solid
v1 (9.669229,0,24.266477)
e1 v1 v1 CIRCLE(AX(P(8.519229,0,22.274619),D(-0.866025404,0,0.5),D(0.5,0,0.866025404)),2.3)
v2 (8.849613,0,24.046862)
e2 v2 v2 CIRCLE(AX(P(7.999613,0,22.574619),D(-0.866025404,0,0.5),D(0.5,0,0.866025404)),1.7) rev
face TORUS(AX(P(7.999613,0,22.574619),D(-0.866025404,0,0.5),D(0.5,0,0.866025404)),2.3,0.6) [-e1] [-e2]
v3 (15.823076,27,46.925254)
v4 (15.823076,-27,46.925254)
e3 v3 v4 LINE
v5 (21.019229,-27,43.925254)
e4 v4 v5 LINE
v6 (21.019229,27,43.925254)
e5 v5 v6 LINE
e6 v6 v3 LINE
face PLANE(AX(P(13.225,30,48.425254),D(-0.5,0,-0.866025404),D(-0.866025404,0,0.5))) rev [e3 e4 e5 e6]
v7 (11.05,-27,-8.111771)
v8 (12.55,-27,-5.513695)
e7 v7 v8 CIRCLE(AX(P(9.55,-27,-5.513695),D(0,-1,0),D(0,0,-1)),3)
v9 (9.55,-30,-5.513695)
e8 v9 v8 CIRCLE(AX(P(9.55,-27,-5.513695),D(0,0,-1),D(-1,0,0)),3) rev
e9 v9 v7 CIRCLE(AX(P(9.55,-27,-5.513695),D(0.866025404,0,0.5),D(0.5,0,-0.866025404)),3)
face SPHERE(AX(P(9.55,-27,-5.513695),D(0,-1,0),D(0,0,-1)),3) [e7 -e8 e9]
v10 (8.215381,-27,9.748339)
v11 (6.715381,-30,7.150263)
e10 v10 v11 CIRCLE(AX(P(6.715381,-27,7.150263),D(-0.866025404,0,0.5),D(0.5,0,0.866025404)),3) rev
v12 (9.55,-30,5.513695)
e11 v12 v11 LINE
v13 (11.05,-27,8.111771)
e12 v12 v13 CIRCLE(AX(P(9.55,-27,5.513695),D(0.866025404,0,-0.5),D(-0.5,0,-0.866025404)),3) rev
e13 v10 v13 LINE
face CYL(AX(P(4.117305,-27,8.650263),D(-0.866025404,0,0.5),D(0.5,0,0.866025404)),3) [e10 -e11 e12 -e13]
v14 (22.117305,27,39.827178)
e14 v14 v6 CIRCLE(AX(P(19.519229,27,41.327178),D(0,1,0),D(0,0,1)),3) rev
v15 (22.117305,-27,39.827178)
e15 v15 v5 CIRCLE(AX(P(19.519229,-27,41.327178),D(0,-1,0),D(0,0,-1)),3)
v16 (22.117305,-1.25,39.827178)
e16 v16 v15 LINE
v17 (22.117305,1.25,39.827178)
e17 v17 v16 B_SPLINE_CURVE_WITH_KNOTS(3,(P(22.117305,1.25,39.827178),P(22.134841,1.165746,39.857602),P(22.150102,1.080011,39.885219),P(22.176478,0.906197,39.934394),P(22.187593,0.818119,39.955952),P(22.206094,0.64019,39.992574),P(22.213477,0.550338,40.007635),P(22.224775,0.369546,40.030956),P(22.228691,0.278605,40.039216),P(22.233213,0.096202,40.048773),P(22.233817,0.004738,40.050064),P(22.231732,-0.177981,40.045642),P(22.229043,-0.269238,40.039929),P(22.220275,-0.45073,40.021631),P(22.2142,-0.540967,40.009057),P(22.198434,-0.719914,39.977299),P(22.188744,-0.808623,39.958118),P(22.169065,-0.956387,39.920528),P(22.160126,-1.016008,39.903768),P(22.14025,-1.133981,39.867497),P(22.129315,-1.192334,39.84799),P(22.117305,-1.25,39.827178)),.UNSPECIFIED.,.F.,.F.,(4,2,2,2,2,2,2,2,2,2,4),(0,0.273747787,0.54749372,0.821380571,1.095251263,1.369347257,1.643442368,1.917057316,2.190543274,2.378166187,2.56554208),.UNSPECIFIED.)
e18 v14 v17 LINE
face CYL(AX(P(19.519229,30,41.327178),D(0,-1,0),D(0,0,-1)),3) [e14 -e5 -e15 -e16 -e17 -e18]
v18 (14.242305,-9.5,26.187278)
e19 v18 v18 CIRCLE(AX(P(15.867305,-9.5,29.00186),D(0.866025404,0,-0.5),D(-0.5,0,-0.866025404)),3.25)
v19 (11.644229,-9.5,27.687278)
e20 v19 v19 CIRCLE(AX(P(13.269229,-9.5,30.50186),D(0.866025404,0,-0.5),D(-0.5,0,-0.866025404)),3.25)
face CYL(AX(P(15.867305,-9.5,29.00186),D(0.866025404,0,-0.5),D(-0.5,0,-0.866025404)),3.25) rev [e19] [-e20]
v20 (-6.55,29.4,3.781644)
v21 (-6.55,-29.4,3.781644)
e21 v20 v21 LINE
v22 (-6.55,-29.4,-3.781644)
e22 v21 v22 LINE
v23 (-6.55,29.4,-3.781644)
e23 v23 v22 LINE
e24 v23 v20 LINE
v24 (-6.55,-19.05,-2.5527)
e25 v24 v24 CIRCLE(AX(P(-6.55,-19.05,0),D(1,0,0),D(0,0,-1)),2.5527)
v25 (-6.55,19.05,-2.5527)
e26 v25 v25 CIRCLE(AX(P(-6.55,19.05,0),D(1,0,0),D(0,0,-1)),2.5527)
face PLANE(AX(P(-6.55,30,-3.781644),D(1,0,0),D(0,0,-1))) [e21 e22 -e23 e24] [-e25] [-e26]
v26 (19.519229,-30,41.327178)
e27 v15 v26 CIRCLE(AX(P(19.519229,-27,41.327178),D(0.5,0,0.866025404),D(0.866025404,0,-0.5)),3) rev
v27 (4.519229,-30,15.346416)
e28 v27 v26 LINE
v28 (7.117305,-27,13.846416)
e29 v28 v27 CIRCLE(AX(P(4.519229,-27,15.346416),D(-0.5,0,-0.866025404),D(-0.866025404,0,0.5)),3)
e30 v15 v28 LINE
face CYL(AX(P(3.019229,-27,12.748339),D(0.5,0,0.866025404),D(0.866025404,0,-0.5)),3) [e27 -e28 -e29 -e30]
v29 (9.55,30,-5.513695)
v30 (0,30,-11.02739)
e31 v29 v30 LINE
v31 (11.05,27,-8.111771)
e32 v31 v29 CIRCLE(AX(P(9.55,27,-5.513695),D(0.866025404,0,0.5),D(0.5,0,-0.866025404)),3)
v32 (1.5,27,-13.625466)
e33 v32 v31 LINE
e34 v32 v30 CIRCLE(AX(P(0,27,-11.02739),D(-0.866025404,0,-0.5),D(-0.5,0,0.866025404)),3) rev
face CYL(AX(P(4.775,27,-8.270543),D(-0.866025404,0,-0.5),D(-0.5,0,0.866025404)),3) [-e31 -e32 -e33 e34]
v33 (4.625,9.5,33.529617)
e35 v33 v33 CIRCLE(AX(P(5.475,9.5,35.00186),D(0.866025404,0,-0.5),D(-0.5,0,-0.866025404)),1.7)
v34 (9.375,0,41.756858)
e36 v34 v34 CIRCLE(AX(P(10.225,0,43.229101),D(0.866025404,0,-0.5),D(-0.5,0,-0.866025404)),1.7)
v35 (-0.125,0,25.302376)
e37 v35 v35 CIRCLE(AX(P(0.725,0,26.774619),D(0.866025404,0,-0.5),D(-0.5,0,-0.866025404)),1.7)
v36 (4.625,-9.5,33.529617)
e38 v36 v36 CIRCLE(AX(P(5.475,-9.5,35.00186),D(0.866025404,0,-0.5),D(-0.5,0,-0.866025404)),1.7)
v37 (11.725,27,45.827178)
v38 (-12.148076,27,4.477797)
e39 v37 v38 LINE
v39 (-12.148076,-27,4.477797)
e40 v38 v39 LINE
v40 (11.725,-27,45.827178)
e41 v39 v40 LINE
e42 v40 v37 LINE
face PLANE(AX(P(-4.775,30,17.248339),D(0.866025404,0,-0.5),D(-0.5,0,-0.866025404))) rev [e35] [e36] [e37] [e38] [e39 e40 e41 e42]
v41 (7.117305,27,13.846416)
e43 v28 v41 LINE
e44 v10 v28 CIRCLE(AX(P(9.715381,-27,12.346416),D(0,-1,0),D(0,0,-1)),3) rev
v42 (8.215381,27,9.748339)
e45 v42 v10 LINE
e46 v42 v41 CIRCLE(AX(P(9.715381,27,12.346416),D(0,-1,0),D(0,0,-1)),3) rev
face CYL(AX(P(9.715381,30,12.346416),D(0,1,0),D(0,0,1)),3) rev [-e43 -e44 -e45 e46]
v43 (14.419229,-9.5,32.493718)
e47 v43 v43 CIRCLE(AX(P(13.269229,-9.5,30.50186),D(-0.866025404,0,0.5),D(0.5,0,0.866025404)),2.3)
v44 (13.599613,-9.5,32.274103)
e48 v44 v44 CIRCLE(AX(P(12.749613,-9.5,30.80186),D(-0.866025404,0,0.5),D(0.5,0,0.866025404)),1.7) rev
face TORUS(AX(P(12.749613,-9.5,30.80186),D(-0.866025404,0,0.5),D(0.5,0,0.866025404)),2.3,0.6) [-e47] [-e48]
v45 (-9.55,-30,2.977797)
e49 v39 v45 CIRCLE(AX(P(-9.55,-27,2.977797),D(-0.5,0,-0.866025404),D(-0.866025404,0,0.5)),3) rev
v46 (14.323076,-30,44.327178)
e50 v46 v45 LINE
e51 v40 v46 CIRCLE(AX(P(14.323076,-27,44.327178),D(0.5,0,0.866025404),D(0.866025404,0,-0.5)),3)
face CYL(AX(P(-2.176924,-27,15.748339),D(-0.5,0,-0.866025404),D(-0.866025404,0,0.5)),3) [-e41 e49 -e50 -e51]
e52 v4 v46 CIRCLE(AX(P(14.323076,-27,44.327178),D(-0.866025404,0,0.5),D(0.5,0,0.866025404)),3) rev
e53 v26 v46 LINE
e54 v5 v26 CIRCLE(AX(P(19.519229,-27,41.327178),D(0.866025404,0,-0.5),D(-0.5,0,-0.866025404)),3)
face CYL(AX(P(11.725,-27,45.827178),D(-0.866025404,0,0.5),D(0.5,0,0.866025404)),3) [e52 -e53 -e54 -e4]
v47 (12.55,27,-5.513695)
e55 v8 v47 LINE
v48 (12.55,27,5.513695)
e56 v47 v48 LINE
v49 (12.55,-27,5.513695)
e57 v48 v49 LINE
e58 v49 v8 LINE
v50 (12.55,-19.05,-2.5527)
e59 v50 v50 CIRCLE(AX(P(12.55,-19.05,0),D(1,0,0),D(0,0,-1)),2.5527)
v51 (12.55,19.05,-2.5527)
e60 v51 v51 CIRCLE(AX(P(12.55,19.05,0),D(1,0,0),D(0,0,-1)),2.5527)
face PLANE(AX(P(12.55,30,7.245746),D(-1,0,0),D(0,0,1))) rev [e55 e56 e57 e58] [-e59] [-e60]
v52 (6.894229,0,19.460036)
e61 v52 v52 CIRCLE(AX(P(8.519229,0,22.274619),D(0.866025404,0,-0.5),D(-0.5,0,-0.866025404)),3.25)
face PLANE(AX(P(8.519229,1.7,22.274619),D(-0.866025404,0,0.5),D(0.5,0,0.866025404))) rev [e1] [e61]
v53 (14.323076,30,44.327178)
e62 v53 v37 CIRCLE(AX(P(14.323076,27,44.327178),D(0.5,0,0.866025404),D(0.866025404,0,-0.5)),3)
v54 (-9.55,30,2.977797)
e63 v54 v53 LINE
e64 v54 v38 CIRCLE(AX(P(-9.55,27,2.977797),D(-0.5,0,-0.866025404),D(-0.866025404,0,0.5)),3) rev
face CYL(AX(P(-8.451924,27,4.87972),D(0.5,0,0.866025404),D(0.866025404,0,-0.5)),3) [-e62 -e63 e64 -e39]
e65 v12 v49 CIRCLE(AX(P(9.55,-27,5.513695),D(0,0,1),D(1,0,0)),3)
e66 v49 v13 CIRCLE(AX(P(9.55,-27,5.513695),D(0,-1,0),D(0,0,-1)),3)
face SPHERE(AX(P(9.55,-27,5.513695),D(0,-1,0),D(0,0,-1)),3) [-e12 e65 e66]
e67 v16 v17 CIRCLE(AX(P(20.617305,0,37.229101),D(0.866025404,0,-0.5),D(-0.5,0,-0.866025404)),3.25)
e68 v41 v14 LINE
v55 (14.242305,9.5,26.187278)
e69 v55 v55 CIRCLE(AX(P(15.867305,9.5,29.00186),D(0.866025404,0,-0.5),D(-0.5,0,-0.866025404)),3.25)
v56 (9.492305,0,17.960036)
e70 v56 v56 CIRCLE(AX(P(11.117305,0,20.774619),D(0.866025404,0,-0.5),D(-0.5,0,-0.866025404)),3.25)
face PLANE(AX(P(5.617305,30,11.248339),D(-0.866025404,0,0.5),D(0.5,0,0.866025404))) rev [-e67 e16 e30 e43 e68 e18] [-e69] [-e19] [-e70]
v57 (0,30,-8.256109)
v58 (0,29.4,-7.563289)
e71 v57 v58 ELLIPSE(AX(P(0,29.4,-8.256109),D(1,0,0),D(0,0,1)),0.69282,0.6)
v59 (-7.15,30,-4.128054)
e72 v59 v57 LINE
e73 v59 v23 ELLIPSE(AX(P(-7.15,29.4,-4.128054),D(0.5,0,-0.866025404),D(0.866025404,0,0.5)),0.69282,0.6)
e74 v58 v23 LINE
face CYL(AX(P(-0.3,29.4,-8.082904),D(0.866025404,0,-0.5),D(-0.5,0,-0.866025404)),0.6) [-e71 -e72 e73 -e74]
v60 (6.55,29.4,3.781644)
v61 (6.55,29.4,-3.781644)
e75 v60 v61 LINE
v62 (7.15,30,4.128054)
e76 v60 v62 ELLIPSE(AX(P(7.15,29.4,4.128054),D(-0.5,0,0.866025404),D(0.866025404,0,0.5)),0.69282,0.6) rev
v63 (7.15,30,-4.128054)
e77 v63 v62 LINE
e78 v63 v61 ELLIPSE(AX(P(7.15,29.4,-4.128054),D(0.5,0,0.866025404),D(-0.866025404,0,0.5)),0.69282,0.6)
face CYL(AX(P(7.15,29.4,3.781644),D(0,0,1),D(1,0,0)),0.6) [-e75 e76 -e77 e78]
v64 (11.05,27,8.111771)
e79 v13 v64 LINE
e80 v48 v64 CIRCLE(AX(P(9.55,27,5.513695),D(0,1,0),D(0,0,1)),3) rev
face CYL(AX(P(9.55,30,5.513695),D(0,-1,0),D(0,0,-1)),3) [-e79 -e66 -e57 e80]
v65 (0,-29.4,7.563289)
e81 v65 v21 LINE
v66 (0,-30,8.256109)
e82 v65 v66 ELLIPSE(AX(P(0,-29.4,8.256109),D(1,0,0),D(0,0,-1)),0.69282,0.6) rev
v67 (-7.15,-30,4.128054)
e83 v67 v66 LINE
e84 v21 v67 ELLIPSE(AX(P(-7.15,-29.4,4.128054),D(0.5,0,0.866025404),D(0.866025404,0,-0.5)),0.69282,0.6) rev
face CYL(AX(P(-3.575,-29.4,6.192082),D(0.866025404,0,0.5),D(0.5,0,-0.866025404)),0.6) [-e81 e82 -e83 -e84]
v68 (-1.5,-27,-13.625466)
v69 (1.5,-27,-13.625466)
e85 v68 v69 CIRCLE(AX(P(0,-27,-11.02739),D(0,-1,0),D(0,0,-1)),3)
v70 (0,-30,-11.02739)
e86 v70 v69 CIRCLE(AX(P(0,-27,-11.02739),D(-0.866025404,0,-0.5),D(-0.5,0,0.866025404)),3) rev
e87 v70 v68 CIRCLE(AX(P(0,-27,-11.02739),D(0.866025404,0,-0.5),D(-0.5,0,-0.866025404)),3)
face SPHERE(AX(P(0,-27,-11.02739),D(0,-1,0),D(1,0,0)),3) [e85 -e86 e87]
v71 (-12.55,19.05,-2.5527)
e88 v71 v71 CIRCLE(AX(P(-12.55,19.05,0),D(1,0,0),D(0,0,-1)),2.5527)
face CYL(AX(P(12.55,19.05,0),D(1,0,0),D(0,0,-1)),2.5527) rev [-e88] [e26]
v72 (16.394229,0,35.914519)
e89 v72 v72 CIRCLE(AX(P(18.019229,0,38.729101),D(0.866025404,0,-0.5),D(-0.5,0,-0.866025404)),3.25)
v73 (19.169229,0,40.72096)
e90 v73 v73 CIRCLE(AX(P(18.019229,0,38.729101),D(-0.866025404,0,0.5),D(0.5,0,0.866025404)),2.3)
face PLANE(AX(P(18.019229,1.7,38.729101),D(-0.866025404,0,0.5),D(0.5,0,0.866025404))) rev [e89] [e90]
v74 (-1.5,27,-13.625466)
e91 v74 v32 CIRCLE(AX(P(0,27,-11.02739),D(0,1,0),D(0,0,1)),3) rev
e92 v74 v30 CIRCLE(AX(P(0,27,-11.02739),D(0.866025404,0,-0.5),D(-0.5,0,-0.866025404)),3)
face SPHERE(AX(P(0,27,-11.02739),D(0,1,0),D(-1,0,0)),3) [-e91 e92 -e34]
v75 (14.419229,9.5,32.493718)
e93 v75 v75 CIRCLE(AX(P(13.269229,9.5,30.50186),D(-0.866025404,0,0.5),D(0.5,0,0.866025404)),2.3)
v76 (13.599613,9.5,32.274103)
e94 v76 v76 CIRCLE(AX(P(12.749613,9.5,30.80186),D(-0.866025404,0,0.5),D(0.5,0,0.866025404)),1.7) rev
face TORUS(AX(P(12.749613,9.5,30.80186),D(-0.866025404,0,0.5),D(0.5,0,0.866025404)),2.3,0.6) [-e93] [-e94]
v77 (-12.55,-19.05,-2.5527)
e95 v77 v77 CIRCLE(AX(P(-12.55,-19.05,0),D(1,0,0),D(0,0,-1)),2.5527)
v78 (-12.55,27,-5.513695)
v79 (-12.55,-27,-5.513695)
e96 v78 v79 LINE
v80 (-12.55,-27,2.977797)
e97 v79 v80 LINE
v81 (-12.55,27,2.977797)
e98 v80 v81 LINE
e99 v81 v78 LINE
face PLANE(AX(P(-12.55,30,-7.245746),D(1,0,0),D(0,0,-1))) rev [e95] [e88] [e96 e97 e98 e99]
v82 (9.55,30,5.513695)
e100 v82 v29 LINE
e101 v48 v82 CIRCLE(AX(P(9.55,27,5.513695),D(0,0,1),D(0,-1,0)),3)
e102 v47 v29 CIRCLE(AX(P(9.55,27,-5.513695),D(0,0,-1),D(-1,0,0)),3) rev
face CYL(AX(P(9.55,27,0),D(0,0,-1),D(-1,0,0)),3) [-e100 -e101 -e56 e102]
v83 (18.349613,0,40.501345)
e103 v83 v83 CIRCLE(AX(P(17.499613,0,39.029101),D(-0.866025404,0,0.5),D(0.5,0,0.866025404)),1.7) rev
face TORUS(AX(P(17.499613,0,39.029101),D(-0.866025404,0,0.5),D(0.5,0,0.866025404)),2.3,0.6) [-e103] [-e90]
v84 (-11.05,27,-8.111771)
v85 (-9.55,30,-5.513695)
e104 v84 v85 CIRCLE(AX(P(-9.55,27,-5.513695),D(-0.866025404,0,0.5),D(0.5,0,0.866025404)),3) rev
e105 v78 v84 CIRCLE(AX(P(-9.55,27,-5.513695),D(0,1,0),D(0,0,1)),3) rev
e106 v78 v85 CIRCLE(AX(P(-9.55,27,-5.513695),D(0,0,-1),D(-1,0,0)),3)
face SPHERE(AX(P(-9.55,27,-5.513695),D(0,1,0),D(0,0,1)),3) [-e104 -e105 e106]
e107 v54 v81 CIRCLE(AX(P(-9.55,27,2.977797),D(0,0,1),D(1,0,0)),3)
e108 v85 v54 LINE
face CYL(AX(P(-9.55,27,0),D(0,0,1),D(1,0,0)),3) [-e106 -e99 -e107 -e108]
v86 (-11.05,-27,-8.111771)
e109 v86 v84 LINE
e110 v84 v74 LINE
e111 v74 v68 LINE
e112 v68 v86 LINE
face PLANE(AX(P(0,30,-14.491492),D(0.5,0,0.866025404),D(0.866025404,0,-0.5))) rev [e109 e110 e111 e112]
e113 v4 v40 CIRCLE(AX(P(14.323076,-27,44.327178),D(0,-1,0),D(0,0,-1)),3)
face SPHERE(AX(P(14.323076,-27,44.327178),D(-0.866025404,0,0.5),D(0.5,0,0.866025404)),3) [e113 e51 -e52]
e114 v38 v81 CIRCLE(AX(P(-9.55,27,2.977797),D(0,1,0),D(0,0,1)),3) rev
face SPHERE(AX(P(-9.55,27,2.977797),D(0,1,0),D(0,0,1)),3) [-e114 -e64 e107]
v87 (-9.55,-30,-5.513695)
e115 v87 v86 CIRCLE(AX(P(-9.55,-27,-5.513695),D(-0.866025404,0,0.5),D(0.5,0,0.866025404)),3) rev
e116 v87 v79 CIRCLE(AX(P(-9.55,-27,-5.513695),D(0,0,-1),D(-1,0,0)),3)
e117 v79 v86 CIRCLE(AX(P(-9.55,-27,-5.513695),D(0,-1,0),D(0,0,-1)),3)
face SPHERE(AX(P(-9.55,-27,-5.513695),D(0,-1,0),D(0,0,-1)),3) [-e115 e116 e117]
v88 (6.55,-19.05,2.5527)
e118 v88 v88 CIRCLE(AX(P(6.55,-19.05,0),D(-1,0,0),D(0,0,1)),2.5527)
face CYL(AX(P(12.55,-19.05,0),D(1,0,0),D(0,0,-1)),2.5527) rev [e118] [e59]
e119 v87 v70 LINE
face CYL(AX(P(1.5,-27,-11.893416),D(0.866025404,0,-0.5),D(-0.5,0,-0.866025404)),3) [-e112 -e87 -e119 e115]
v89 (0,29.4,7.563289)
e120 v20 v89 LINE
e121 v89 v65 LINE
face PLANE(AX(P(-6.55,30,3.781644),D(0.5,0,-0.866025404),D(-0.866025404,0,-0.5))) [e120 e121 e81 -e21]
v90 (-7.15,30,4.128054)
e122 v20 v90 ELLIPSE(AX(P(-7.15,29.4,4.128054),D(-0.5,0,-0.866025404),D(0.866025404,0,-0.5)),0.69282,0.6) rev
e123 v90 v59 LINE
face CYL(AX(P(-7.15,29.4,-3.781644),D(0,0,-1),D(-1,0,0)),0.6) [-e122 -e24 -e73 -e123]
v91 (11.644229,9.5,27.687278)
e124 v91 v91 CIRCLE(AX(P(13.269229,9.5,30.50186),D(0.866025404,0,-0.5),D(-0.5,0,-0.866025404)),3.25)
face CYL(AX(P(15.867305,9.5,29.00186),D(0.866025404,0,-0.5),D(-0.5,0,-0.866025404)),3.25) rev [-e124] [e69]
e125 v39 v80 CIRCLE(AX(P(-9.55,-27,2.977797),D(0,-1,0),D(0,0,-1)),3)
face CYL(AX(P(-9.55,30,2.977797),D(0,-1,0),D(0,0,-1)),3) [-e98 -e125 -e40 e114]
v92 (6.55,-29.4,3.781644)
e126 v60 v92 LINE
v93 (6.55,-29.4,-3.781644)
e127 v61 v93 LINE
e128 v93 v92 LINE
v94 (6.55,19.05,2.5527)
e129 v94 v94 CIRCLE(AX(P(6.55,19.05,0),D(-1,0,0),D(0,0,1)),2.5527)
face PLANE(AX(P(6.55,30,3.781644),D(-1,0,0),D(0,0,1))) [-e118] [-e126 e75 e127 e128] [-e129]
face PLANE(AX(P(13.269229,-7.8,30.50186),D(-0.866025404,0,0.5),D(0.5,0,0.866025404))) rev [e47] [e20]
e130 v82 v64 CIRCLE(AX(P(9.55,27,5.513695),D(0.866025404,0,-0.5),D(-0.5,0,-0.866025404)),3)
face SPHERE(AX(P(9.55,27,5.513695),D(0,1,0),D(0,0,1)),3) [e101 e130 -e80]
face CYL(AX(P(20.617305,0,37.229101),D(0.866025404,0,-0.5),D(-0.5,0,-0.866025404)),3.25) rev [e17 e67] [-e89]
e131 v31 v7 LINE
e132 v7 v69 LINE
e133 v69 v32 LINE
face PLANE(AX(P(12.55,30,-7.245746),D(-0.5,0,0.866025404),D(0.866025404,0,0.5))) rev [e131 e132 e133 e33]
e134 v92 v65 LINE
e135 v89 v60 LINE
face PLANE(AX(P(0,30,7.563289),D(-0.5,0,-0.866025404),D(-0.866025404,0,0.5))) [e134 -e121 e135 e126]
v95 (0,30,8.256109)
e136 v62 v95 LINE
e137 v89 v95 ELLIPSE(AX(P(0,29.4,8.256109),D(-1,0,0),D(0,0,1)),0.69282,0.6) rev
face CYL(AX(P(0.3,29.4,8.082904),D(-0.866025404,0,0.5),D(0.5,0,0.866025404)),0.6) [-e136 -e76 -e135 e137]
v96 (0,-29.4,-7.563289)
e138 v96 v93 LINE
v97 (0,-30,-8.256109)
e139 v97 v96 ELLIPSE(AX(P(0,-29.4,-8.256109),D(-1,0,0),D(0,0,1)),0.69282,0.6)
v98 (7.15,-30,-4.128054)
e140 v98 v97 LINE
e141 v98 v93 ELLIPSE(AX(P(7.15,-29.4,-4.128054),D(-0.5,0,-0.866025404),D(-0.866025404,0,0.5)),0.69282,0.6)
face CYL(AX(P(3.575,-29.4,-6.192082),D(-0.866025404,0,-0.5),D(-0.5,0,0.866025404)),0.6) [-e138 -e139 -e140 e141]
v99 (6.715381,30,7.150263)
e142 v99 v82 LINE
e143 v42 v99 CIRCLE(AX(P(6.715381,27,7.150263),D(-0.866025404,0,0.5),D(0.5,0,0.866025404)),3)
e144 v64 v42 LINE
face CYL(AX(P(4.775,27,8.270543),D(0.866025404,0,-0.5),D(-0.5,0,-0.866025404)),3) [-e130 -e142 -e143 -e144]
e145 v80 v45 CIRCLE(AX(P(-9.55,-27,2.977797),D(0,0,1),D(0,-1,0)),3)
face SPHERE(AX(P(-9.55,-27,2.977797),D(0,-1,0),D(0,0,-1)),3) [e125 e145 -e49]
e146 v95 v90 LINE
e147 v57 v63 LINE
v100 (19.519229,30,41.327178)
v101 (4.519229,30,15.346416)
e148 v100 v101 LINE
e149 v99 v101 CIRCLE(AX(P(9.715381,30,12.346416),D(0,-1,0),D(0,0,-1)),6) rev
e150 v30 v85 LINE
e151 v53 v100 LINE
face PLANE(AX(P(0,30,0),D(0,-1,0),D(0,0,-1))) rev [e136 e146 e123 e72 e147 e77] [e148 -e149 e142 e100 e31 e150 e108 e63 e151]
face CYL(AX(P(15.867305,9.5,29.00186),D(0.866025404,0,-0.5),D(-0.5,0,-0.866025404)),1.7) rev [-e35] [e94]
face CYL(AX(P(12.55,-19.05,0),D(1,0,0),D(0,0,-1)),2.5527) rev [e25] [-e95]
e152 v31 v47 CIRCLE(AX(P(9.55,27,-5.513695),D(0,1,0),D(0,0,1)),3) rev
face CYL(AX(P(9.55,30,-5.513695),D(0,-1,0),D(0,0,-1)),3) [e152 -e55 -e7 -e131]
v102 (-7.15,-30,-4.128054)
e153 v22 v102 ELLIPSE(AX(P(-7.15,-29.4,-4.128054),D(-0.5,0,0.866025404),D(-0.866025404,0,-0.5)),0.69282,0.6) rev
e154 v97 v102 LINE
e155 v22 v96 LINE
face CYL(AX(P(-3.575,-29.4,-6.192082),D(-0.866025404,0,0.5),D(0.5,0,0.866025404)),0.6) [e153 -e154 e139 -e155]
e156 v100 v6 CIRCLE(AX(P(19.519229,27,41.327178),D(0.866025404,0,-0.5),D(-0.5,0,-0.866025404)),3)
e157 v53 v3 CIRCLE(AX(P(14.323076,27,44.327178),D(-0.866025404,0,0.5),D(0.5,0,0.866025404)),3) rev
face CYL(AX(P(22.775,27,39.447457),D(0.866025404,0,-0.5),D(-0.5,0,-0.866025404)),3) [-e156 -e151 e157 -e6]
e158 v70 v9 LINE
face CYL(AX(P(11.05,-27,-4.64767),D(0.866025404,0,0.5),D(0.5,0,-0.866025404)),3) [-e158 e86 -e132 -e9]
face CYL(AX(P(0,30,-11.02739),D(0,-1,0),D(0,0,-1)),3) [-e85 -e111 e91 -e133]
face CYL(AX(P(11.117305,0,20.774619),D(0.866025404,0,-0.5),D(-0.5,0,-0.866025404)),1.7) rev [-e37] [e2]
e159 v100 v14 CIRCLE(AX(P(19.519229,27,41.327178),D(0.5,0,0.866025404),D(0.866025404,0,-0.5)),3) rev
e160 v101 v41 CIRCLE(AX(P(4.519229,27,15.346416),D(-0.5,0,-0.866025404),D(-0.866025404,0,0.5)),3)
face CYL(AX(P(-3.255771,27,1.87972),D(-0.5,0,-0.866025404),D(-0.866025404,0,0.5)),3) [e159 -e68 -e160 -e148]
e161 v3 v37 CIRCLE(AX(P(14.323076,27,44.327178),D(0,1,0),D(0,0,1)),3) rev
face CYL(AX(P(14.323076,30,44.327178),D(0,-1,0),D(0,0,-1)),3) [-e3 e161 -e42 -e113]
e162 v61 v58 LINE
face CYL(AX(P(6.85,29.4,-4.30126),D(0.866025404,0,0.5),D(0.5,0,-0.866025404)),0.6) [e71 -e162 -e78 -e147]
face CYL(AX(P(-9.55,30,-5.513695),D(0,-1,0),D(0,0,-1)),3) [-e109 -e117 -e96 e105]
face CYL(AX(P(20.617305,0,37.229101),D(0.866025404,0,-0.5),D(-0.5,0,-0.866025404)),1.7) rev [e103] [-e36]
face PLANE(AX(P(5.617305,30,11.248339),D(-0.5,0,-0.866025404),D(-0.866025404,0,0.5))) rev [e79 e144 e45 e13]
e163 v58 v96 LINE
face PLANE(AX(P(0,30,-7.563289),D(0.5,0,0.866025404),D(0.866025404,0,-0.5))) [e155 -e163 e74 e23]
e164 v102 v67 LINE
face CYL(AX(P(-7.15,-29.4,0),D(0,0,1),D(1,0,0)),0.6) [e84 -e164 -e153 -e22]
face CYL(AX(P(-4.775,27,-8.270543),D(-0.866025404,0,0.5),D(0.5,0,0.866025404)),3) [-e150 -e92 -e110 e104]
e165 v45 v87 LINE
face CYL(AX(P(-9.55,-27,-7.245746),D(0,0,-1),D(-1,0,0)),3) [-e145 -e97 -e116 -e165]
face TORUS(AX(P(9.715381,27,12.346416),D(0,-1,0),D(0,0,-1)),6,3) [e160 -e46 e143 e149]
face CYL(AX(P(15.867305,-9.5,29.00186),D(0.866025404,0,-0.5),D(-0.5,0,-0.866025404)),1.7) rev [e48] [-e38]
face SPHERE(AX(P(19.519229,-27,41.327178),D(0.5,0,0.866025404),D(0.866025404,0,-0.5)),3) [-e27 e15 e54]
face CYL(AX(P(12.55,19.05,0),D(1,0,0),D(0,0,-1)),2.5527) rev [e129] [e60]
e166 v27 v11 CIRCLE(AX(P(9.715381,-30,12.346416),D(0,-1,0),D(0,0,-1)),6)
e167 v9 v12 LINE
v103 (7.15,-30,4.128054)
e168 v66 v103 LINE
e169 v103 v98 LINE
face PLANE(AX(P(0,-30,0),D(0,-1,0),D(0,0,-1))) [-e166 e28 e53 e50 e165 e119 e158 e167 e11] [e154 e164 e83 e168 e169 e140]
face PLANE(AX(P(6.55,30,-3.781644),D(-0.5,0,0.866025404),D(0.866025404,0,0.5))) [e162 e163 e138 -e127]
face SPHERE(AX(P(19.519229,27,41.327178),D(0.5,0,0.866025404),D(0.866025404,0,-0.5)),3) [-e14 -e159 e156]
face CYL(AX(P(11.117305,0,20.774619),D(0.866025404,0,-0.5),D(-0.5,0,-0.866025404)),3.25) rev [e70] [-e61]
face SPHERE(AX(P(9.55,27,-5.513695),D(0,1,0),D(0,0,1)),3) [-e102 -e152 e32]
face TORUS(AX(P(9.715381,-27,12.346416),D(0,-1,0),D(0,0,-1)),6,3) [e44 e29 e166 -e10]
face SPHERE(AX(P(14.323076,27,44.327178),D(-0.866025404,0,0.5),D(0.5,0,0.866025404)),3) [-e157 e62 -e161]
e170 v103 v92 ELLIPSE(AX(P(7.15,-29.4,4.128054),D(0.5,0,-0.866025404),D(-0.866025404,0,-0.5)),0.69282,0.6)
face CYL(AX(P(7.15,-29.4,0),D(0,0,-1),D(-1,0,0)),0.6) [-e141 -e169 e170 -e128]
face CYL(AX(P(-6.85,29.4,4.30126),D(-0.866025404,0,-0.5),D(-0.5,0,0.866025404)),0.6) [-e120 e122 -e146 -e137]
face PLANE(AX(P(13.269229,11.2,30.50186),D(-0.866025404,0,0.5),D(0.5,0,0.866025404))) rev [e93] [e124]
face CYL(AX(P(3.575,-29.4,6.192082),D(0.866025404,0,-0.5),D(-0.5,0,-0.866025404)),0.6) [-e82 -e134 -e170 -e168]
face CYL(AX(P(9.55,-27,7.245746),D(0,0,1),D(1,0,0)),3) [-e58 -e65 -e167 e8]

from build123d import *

# Parameters (mm, degrees)
BOSS_EXTRUDE1_DEPTH            = 30
CBORE_FOR_M3_SHCS1_D           = 3.4
CBORE_FOR_M3_SHCS1_CBORE_D     = 6.5
CBORE_FOR_M3_SHCS1_CBORE_DEPTH = 3
F_10_CLEARANCE_HOLE1_D         = 5.1054
FILLET1_R                      = 3
FILLET2_R                      = 0.6


with BuildPart() as part:
    # Sketch1 → Boss-Extrude1 (new, symmetric)
    with BuildSketch(Plane(origin=(0, 0, 0), x_dir=(1, 0, 0), z_dir=(0, 1, 0))):
        Polygon((-4.775, -17.248339292), (13.225, -48.425253828), (23.617304845, -42.425253828), (5.617304845, -11.248339292), (12.55, -7.245745878), (12.55, 7.245745878), (0, 14.491491757), (-12.55, 7.245745878), (-12.55, -3.781644263), align=None)
        Polygon((6.55, -3.781644263), (6.55, 3.781644263), (0, 7.563288526), (-6.55, 3.781644263), (-6.55, -3.781644263), (0, -7.563288526), align=None, mode=Mode.SUBTRACT)
    extrude(amount=BOSS_EXTRUDE1_DEPTH, both=True)

    # CBORE for M3 SHCS1 (through all)
    with Locations(Plane(origin=(-0.657695155, 0, 0.379720475), x_dir=(-0.5000000000000012, 0, -0.866025403784438), z_dir=(0.8660254037844379, 0, -0.5000000000000011))):
        with Locations((-33.05, 9.5), (-42.55, 0), (-23.55, 0), (-33.05, -9.5)):
            CounterBoreHole(CBORE_FOR_M3_SHCS1_D / 2, CBORE_FOR_M3_SHCS1_CBORE_D / 2, CBORE_FOR_M3_SHCS1_CBORE_DEPTH)

    # #10 Clearance Hole1 (through all)
    with Locations(Plane(origin=(12.55, 0, 0), x_dir=(0, 0, -1), z_dir=(1, 0, 0))):
        with Locations((0, -19.05), (0, 19.05)):
            Hole(F_10_CLEARANCE_HOLE1_D / 2)

    # Fillet1
    # the kernel refuses this fillet: 3 mm, written as the material it adds along each edge
    with BuildSketch(Plane(origin=(5.617304845, -30, 11.248339292), x_dir=(0.5000000000000009, 0, 0.8660254037844382), z_dir=(0, 1, 0))) as fillet1_piece_1:
        with BuildLine():
            CenterArc((FILLET1_R, FILLET1_R), FILLET1_R, 180, 90)
            Line((0, FILLET1_R), (0, 0))
            Line((0, 0), (FILLET1_R, 0))
        make_face()
    extrude(amount=60)
    # the kernel refuses this fillet: 3 mm, written as the material it takes off along each edge
    with BuildSketch(Plane(origin=(-9.55, -27, -5.513695071), x_dir=(-1, 0, 0), z_dir=(0, -1, 0))) as fillet1_2_piece_1_section:
        Polygon((0, 0), (FILLET1_R, 0), (FILLET1_R, FILLET1_R * 0.57735026919), (FILLET1_R * 0.5, FILLET1_R * 0.866025403784), align=None)
    fillet1_2_piece_1 = extrude(amount=FILLET1_R, mode=Mode.PRIVATE)
    fillet1_2_piece_1 = fillet1_2_piece_1 - Plane(origin=(-9.55, -27, -5.513695071), x_dir=(0.8660254037844387, 0, 0.5000000000000001), z_dir=(0, -1, 0)) * Sphere(FILLET1_R, mode=Mode.PRIVATE)
    add(fillet1_2_piece_1, mode=Mode.SUBTRACT)
    with BuildSketch(Plane(origin=(-9.55, -27, 2.977796686), x_dir=(-1, 0, 0), z_dir=(0, -1, 0))) as fillet1_2_piece_2_section:
        Polygon((0, 0), (FILLET1_R, 0), (FILLET1_R, -FILLET1_R * 0.267949192431), (FILLET1_R * 0.866025403784, -FILLET1_R * 0.5), align=None)
    fillet1_2_piece_2 = extrude(amount=FILLET1_R, mode=Mode.PRIVATE)
    fillet1_2_piece_2 = fillet1_2_piece_2 - Plane(origin=(-9.55, -27, 2.977796686), x_dir=(0.9659258262890681, 0, -0.25881904510252146), z_dir=(0, -1, 0)) * Sphere(FILLET1_R, mode=Mode.PRIVATE)
    add(fillet1_2_piece_2, mode=Mode.SUBTRACT)
    with BuildSketch(Plane(origin=(0, -27, -11.027390142), x_dir=(0.5000000000000001, 0, -0.8660254037844387), z_dir=(0, -1, 0))) as fillet1_2_piece_3_section:
        Polygon((0, 0), (FILLET1_R, 0), (FILLET1_R, -FILLET1_R * 0.57735026919), (FILLET1_R * 0.5, -FILLET1_R * 0.866025403784), align=None)
    fillet1_2_piece_3 = extrude(amount=FILLET1_R, mode=Mode.PRIVATE)
    fillet1_2_piece_3 = fillet1_2_piece_3 - Plane(origin=(0, -27, -11.027390142), x_dir=(0, 0, 1), z_dir=(0, -1, 0)) * Sphere(FILLET1_R, mode=Mode.PRIVATE)
    add(fillet1_2_piece_3, mode=Mode.SUBTRACT)
    with BuildSketch(Plane(origin=(9.55, -27, -5.513695071), x_dir=(1, 0, 0), z_dir=(0, -1, 0))) as fillet1_2_piece_4_section:
        Polygon((0, 0), (FILLET1_R, 0), (FILLET1_R, -FILLET1_R * 0.57735026919), (FILLET1_R * 0.5, -FILLET1_R * 0.866025403784), align=None)
    fillet1_2_piece_4 = extrude(amount=FILLET1_R, mode=Mode.PRIVATE)
    fillet1_2_piece_4 = fillet1_2_piece_4 - Plane(origin=(9.55, -27, -5.513695071), x_dir=(-0.8660254037844387, 0, 0.5000000000000001), z_dir=(0, -1, 0)) * Sphere(FILLET1_R, mode=Mode.PRIVATE)
    add(fillet1_2_piece_4, mode=Mode.SUBTRACT)
    with BuildSketch(Plane(origin=(9.55, -27, 5.513695071), x_dir=(1, 0, 0), z_dir=(0, -1, 0))) as fillet1_2_piece_5_section:
        Polygon((0, 0), (FILLET1_R, 0), (FILLET1_R, FILLET1_R * 0.57735026919), (FILLET1_R * 0.5, FILLET1_R * 0.866025403784), align=None)
    fillet1_2_piece_5 = extrude(amount=FILLET1_R, mode=Mode.PRIVATE)
    fillet1_2_piece_5 = fillet1_2_piece_5 - Plane(origin=(9.55, -27, 5.513695071), x_dir=(-0.8660254037844387, 0, -0.5000000000000001), z_dir=(0, -1, 0)) * Sphere(FILLET1_R, mode=Mode.PRIVATE)
    add(fillet1_2_piece_5, mode=Mode.SUBTRACT)
    with BuildSketch(Plane(origin=(19.519228634, -27, 41.327177617), x_dir=(0, -1, 0), z_dir=(0.866025403784438, 0, -0.5000000000000012))) as fillet1_2_piece_6_section:
        Polygon((0, 0), (FILLET1_R, 0), (FILLET1_R, -FILLET1_R), (0, -FILLET1_R), align=None)
    fillet1_2_piece_6 = extrude(amount=FILLET1_R, mode=Mode.PRIVATE)
    fillet1_2_piece_6 = fillet1_2_piece_6 - Plane(origin=(19.519228634, -27, 41.327177617), x_dir=(-0.3535533905932746, 0.7071067811865475, -0.612372435695794), z_dir=(0.866025403784438, 0, -0.5000000000000012)) * Sphere(FILLET1_R, mode=Mode.PRIVATE)
    add(fillet1_2_piece_6, mode=Mode.SUBTRACT)
    with BuildSketch(Plane(origin=(14.323076211, -27, 44.327177617), x_dir=(0.5000000000000012, 0, 0.866025403784438), z_dir=(-0.8660254037844379, 0, 0.5000000000000012))) as fillet1_2_piece_7_section:
        Polygon((0, 0), (FILLET1_R, 0), (FILLET1_R, -FILLET1_R), (0, -FILLET1_R), align=None)
    fillet1_2_piece_7 = extrude(amount=FILLET1_R, mode=Mode.PRIVATE)
    fillet1_2_piece_7 = fillet1_2_piece_7 - Plane(origin=(14.323076211, -27, 44.327177617), x_dir=(-0.3535533905932746, 0.7071067811865475, -0.612372435695794), z_dir=(-0.8660254037844379, 0, 0.5000000000000012)) * Sphere(FILLET1_R, mode=Mode.PRIVATE)
    add(fillet1_2_piece_7, mode=Mode.SUBTRACT)
    with BuildSketch(Plane(origin=(9.55, 27, 5.513695071), x_dir=(1, 0, 0), z_dir=(0, 1, 0))) as fillet1_2_piece_8_section:
        Polygon((0, 0), (FILLET1_R, 0), (FILLET1_R, -FILLET1_R * 0.57735026919), (FILLET1_R * 0.5, -FILLET1_R * 0.866025403784), align=None)
    fillet1_2_piece_8 = extrude(amount=FILLET1_R, mode=Mode.PRIVATE)
    fillet1_2_piece_8 = fillet1_2_piece_8 - Plane(origin=(9.55, 27, 5.513695071), x_dir=(-0.8660254037844387, 0, -0.5000000000000001), z_dir=(0, 1, 0)) * Sphere(FILLET1_R, mode=Mode.PRIVATE)
    add(fillet1_2_piece_8, mode=Mode.SUBTRACT)
    with BuildSketch(Plane(origin=(14.323076211, 27, 44.327177617), x_dir=(0.5000000000000012, 0, 0.866025403784438), z_dir=(-0.8660254037844379, 0, 0.5000000000000012))) as fillet1_2_piece_9_section:
        Polygon((0, 0), (FILLET1_R, 0), (FILLET1_R, FILLET1_R), (0, FILLET1_R), align=None)
    fillet1_2_piece_9 = extrude(amount=FILLET1_R, mode=Mode.PRIVATE)
    fillet1_2_piece_9 = fillet1_2_piece_9 - Plane(origin=(14.323076211, 27, 44.327177617), x_dir=(-0.3535533905932746, -0.7071067811865475, -0.612372435695794), z_dir=(-0.8660254037844379, 0, 0.5000000000000012)) * Sphere(FILLET1_R, mode=Mode.PRIVATE)
    add(fillet1_2_piece_9, mode=Mode.SUBTRACT)
    with BuildSketch(Plane(origin=(-9.55, 27, 2.977796686), x_dir=(-1, 0, 0), z_dir=(0, 1, 0))) as fillet1_2_piece_10_section:
        Polygon((0, 0), (FILLET1_R, 0), (FILLET1_R, FILLET1_R * 0.267949192431), (FILLET1_R * 0.866025403784, FILLET1_R * 0.5), align=None)
    fillet1_2_piece_10 = extrude(amount=FILLET1_R, mode=Mode.PRIVATE)
    fillet1_2_piece_10 = fillet1_2_piece_10 - Plane(origin=(-9.55, 27, 2.977796686), x_dir=(0.9659258262890681, 0, -0.25881904510252146), z_dir=(0, 1, 0)) * Sphere(FILLET1_R, mode=Mode.PRIVATE)
    add(fillet1_2_piece_10, mode=Mode.SUBTRACT)
    with BuildSketch(Plane(origin=(-9.55, 27, -5.513695071), x_dir=(-1, 0, 0), z_dir=(0, 1, 0))) as fillet1_2_piece_11_section:
        Polygon((0, 0), (FILLET1_R, 0), (FILLET1_R, -FILLET1_R * 0.57735026919), (FILLET1_R * 0.5, -FILLET1_R * 0.866025403784), align=None)
    fillet1_2_piece_11 = extrude(amount=FILLET1_R, mode=Mode.PRIVATE)
    fillet1_2_piece_11 = fillet1_2_piece_11 - Plane(origin=(-9.55, 27, -5.513695071), x_dir=(0.8660254037844387, 0, 0.5000000000000001), z_dir=(0, 1, 0)) * Sphere(FILLET1_R, mode=Mode.PRIVATE)
    add(fillet1_2_piece_11, mode=Mode.SUBTRACT)
    with BuildSketch(Plane(origin=(0, 27, -11.027390142), x_dir=(0.5000000000000001, 0, -0.8660254037844387), z_dir=(0, 1, 0))) as fillet1_2_piece_12_section:
        Polygon((0, 0), (FILLET1_R, 0), (FILLET1_R, FILLET1_R * 0.57735026919), (FILLET1_R * 0.5, FILLET1_R * 0.866025403784), align=None)
    fillet1_2_piece_12 = extrude(amount=FILLET1_R, mode=Mode.PRIVATE)
    fillet1_2_piece_12 = fillet1_2_piece_12 - Plane(origin=(0, 27, -11.027390142), x_dir=(0, 0, 1), z_dir=(0, 1, 0)) * Sphere(FILLET1_R, mode=Mode.PRIVATE)
    add(fillet1_2_piece_12, mode=Mode.SUBTRACT)
    with BuildSketch(Plane(origin=(9.55, 27, -5.513695071), x_dir=(1, 0, 0), z_dir=(0, 1, 0))) as fillet1_2_piece_13_section:
        Polygon((0, 0), (FILLET1_R, 0), (FILLET1_R, FILLET1_R * 0.57735026919), (FILLET1_R * 0.5, FILLET1_R * 0.866025403784), align=None)
    fillet1_2_piece_13 = extrude(amount=FILLET1_R, mode=Mode.PRIVATE)
    fillet1_2_piece_13 = fillet1_2_piece_13 - Plane(origin=(9.55, 27, -5.513695071), x_dir=(-0.8660254037844387, 0, 0.5000000000000001), z_dir=(0, 1, 0)) * Sphere(FILLET1_R, mode=Mode.PRIVATE)
    add(fillet1_2_piece_13, mode=Mode.SUBTRACT)
    with BuildSketch(Plane(origin=(19.519228634, 27, 41.327177617), x_dir=(0, 1, 0), z_dir=(0.5000000000000012, 0, 0.866025403784438))) as fillet1_2_piece_14_section:
        Polygon((0, 0), (FILLET1_R, 0), (FILLET1_R, -FILLET1_R), (0, -FILLET1_R), align=None)
    fillet1_2_piece_14 = extrude(amount=FILLET1_R, mode=Mode.PRIVATE)
    fillet1_2_piece_14 = fillet1_2_piece_14 - Plane(origin=(19.519228634, 27, 41.327177617), x_dir=(-0.612372435695794, -0.7071067811865475, 0.3535533905932746), z_dir=(0.5000000000000012, 0, 0.866025403784438)) * Sphere(FILLET1_R, mode=Mode.PRIVATE)
    add(fillet1_2_piece_14, mode=Mode.SUBTRACT)
    with BuildSketch(Plane(origin=(-12.55, -30, -5.513695071), x_dir=(1, 0, 0), z_dir=(0, 0, 1))) as fillet1_2_piece_15:
        with BuildLine():
            CenterArc((FILLET1_R, FILLET1_R), FILLET1_R, 180, 90)
            Line((0, FILLET1_R), (0, 0))
            Line((0, 0), (FILLET1_R, 0))
        make_face()
    extrude(amount=8.491491757, mode=Mode.SUBTRACT)
    with BuildSketch(Plane(origin=(-1.5, -30, -13.625466353), x_dir=(0.5000000000000001, 0, 0.8660254037844386), z_dir=(-0.8660254037844387, 0, 0.5000000000000001)), Plane(origin=(11.05, -30, -8.111771282), x_dir=(-0.5, 0, 0.8660254037844386), z_dir=(-0.8660254037844387, 0, -0.5000000000000001)), Plane(origin=(12.55, -30, 5.513695071), x_dir=(-1, 0, 0), z_dir=(0, 0, -1))) as fillet1_2_piece_16:
        with BuildLine():
            CenterArc((FILLET1_R, FILLET1_R), FILLET1_R, 180, 90)
            Line((0, FILLET1_R), (0, 0))
            Line((0, 0), (FILLET1_R, 0))
        make_face()
    extrude(amount=11.027390142, mode=Mode.SUBTRACT)
    with BuildSketch(Plane(origin=(8.215381057, -30, 9.748339292), x_dir=(-0.5, 0, -0.8660254037844386), z_dir=(0.8660254037844387, 0, -0.5000000000000001))) as fillet1_2_piece_17:
        with BuildLine():
            CenterArc((FILLET1_R, FILLET1_R), FILLET1_R, 180, 90)
            Line((0, FILLET1_R), (0, 0))
            Line((0, 0), (FILLET1_R, 0))
        make_face()
    extrude(amount=3.27313602, mode=Mode.SUBTRACT)
    with BuildSketch(Plane(origin=(22.117304845, -30, 39.827177617), x_dir=(-0.8660254037844379, 0, 0.5000000000000012), z_dir=(-0.5000000000000012, 0, -0.866025403784438))) as fillet1_2_piece_18:
        with BuildLine():
            CenterArc((FILLET1_R, FILLET1_R), FILLET1_R, 180, 90)
            Line((0, FILLET1_R), (0, 0))
            Line((0, 0), (FILLET1_R, 0))
        make_face()
    extrude(amount=30, mode=Mode.SUBTRACT)
    with BuildSketch(Plane(origin=(15.823076211, -30, 46.925253828), x_dir=(0, 1, 0), z_dir=(0.866025403784438, 0, -0.5000000000000012))) as fillet1_2_piece_19:
        with BuildLine():
            CenterArc((FILLET1_R, -FILLET1_R), FILLET1_R, 90, 90)
            Line((0, -FILLET1_R), (0, 0))
            Line((0, 0), (FILLET1_R, 0))
        make_face()
    extrude(amount=6, mode=Mode.SUBTRACT)
    with BuildSketch(Plane(origin=(8.215381057, 30, 9.748339292), x_dir=(-0.5, 0, -0.8660254037844386), z_dir=(0.8660254037844387, 0, -0.5000000000000001))) as fillet1_2_piece_20:
        with BuildLine():
            CenterArc((FILLET1_R, -FILLET1_R), FILLET1_R, 90, 90)
            Line((0, -FILLET1_R), (0, 0))
            Line((0, 0), (FILLET1_R, 0))
        make_face()
    extrude(amount=3.27313602, mode=Mode.SUBTRACT)
    with BuildSketch(Plane(origin=(13.225, -27, 48.425253828), x_dir=(-0.5000000000000022, 0, -0.8660254037844374), z_dir=(0, 1, 0)), Plane(origin=(23.617304845, -27, 42.425253828), x_dir=(-0.8660254037844379, 0, 0.500000000000001), z_dir=(0, 1, 0))) as fillet1_2_piece_21:
        with BuildLine():
            CenterArc((FILLET1_R, -FILLET1_R), FILLET1_R, 90, 90)
            Line((0, -FILLET1_R), (0, 0))
            Line((0, 0), (FILLET1_R, 0))
        make_face()
    extrude(amount=54, mode=Mode.SUBTRACT)
    with BuildSketch(Plane(origin=(-12.55, 27, 3.781644263), x_dir=(0.49999999999999556, 0, 0.8660254037844412), z_dir=(0, -1, 0))) as fillet1_2_piece_22:
        with BuildLine():
            CenterArc((FILLET1_R * 0.267949192431, -FILLET1_R), FILLET1_R, 90, 30)
            Line((-FILLET1_R * 0.232050807569, -FILLET1_R * 0.133974596216), (0, 0))
            Line((0, 0), (FILLET1_R * 0.267949192431, 0))
        make_face()
    extrude(amount=54, mode=Mode.SUBTRACT)
    with BuildSketch(Plane(origin=(-12.55, 27, -7.245745878), x_dir=(0, 0, 1), z_dir=(0, -1, 0)), Plane(origin=(0, -27, -14.491491757), x_dir=(0.8660254037844387, 0, 0.49999999999999994), z_dir=(0, 1, 0)), Plane(origin=(12.55, -27, -7.245745878), x_dir=(0, 0, 1), z_dir=(0, 1, 0)), Plane(origin=(12.55, -27, 7.245745878), x_dir=(-0.8660254037844385, 0, 0.5000000000000002), z_dir=(0, 1, 0))) as fillet1_2_piece_23:
        with BuildLine():
            CenterArc((FILLET1_R * 0.57735026919, -FILLET1_R), FILLET1_R, 90, 60)
            Line((-FILLET1_R * 0.288675134595, -FILLET1_R * 0.5), (0, 0))
            Line((0, 0), (FILLET1_R * 0.57735026919, 0))
        make_face()
    extrude(amount=54, mode=Mode.SUBTRACT)
    with BuildSketch(Plane(origin=(12.55, 30, 5.513695071), x_dir=(-1, 0, 0), z_dir=(0, 0, -1)), Plane(origin=(11.05, 30, -8.111771282), x_dir=(-0.5, 0, 0.8660254037844386), z_dir=(-0.8660254037844387, 0, -0.5000000000000001)), Plane(origin=(-1.5, 30, -13.625466353), x_dir=(0.5000000000000001, 0, 0.8660254037844386), z_dir=(-0.8660254037844387, 0, 0.5000000000000001))) as fillet1_2_piece_24:
        with BuildLine():
            CenterArc((FILLET1_R, -FILLET1_R), FILLET1_R, 90, 90)
            Line((0, -FILLET1_R), (0, 0))
            Line((0, 0), (FILLET1_R, 0))
        make_face()
    extrude(amount=11.027390142, mode=Mode.SUBTRACT)
    with BuildSketch(Plane(origin=(-12.55, 30, -5.513695071), x_dir=(1, 0, 0), z_dir=(0, 0, 1))) as fillet1_2_piece_25:
        with BuildLine():
            CenterArc((FILLET1_R, -FILLET1_R), FILLET1_R, 90, 90)
            Line((0, -FILLET1_R), (0, 0))
            Line((0, 0), (FILLET1_R, 0))
        make_face()
    extrude(amount=8.491491757, mode=Mode.SUBTRACT)
    with BuildSketch(Plane(origin=(11.725, 30, 45.827177617), x_dir=(0, -1, 0), z_dir=(-0.5000000000000012, 0, -0.866025403784438)), Plane(origin=(-12.148076211, -30, 4.477796686), x_dir=(0, 1, 0), z_dir=(0.5000000000000012, 0, 0.866025403784438))) as fillet1_2_piece_26:
        with BuildLine():
            CenterArc((FILLET1_R, -FILLET1_R), FILLET1_R, 90, 90)
            Line((0, -FILLET1_R), (0, 0))
            Line((0, 0), (FILLET1_R, 0))
        make_face()
    extrude(amount=47.746152423, mode=Mode.SUBTRACT)
    with BuildSketch(Plane(origin=(15.823076211, 30, 46.925253828), x_dir=(0, -1, 0), z_dir=(0.866025403784438, 0, -0.5000000000000012))) as fillet1_2_piece_27:
        with BuildLine():
            CenterArc((FILLET1_R, FILLET1_R), FILLET1_R, 180, 90)
            Line((0, FILLET1_R), (0, 0))
            Line((0, 0), (FILLET1_R, 0))
        make_face()
    extrude(amount=6, mode=Mode.SUBTRACT)
    with BuildSketch(Plane(origin=(22.117304845, 30, 39.827177617), x_dir=(-0.8660254037844379, 0, 0.5000000000000012), z_dir=(-0.5000000000000012, 0, -0.866025403784438))) as fillet1_2_piece_28:
        with BuildLine():
            CenterArc((FILLET1_R, -FILLET1_R), FILLET1_R, 90, 90)
            Line((0, -FILLET1_R), (0, 0))
            Line((0, 0), (FILLET1_R, 0))
        make_face()
    extrude(amount=30, mode=Mode.SUBTRACT)
    with BuildSketch(Plane(origin=(9.715381057, 30, 12.346415503), x_dir=(-0.8660254037844379, 0, 0.5000000000000011), z_dir=(0.5000000000000011, 0, 0.8660254037844379))) as fillet1_2_piece_29:
        with BuildLine():
            CenterArc((3 + FILLET1_R, FILLET1_R), FILLET1_R, 180, 90)
            Line((3, FILLET1_R), (3, 0))
            Line((3, 0), (3 + FILLET1_R, 0))
        make_face()
    revolve(axis=Axis((9.715381057, 30, 12.346415503), (0, -1, 0)), revolution_arc=90, mode=Mode.SUBTRACT)
    with BuildSketch(Plane(origin=(9.715381057, -30, 12.346415503), x_dir=(-0.8660254037844379, 0, 0.5000000000000011), z_dir=(0.5000000000000011, 0, 0.8660254037844379))) as fillet1_2_piece_30:
        with BuildLine():
            CenterArc((3 + FILLET1_R, -FILLET1_R), FILLET1_R, 90, 90)
            Line((3, -FILLET1_R), (3, 0))
            Line((3, 0), (3 + FILLET1_R, 0))
        make_face()
    revolve(axis=Axis((9.715381057, -30, 12.346415503), (0, -1, 0)), revolution_arc=90, mode=Mode.SUBTRACT)

    # Fillet2
    fillet2_edges = [part.edges().sort_by_distance(p)[0] for p in [
        (3.275, -30, 5.672466395),
        (6.55, -30, 0),
        (3.275, -30, -5.672466395),
        (-3.275, -30, -5.672466395),
        (-6.55, -30, 0),
        (-3.275, -30, 5.672466395),
        (3.275, 30, 5.672466395),
        (6.55, 30, 0),
        (3.275, 30, -5.672466395),
        (-3.275, 30, -5.672466395),
        (-6.55, 30, 0),
        (-3.275, 30, 5.672466395),
        (12.419228634, -9.5, 29.029616883),
        (7.669228634, 0, 20.802375547),
        (17.169228634, 0, 37.256858219),
        (12.419228634, 9.5, 29.029616883),
    ]]
    fillet(fillet2_edges, radius=FILLET2_R)


solid = part.part
